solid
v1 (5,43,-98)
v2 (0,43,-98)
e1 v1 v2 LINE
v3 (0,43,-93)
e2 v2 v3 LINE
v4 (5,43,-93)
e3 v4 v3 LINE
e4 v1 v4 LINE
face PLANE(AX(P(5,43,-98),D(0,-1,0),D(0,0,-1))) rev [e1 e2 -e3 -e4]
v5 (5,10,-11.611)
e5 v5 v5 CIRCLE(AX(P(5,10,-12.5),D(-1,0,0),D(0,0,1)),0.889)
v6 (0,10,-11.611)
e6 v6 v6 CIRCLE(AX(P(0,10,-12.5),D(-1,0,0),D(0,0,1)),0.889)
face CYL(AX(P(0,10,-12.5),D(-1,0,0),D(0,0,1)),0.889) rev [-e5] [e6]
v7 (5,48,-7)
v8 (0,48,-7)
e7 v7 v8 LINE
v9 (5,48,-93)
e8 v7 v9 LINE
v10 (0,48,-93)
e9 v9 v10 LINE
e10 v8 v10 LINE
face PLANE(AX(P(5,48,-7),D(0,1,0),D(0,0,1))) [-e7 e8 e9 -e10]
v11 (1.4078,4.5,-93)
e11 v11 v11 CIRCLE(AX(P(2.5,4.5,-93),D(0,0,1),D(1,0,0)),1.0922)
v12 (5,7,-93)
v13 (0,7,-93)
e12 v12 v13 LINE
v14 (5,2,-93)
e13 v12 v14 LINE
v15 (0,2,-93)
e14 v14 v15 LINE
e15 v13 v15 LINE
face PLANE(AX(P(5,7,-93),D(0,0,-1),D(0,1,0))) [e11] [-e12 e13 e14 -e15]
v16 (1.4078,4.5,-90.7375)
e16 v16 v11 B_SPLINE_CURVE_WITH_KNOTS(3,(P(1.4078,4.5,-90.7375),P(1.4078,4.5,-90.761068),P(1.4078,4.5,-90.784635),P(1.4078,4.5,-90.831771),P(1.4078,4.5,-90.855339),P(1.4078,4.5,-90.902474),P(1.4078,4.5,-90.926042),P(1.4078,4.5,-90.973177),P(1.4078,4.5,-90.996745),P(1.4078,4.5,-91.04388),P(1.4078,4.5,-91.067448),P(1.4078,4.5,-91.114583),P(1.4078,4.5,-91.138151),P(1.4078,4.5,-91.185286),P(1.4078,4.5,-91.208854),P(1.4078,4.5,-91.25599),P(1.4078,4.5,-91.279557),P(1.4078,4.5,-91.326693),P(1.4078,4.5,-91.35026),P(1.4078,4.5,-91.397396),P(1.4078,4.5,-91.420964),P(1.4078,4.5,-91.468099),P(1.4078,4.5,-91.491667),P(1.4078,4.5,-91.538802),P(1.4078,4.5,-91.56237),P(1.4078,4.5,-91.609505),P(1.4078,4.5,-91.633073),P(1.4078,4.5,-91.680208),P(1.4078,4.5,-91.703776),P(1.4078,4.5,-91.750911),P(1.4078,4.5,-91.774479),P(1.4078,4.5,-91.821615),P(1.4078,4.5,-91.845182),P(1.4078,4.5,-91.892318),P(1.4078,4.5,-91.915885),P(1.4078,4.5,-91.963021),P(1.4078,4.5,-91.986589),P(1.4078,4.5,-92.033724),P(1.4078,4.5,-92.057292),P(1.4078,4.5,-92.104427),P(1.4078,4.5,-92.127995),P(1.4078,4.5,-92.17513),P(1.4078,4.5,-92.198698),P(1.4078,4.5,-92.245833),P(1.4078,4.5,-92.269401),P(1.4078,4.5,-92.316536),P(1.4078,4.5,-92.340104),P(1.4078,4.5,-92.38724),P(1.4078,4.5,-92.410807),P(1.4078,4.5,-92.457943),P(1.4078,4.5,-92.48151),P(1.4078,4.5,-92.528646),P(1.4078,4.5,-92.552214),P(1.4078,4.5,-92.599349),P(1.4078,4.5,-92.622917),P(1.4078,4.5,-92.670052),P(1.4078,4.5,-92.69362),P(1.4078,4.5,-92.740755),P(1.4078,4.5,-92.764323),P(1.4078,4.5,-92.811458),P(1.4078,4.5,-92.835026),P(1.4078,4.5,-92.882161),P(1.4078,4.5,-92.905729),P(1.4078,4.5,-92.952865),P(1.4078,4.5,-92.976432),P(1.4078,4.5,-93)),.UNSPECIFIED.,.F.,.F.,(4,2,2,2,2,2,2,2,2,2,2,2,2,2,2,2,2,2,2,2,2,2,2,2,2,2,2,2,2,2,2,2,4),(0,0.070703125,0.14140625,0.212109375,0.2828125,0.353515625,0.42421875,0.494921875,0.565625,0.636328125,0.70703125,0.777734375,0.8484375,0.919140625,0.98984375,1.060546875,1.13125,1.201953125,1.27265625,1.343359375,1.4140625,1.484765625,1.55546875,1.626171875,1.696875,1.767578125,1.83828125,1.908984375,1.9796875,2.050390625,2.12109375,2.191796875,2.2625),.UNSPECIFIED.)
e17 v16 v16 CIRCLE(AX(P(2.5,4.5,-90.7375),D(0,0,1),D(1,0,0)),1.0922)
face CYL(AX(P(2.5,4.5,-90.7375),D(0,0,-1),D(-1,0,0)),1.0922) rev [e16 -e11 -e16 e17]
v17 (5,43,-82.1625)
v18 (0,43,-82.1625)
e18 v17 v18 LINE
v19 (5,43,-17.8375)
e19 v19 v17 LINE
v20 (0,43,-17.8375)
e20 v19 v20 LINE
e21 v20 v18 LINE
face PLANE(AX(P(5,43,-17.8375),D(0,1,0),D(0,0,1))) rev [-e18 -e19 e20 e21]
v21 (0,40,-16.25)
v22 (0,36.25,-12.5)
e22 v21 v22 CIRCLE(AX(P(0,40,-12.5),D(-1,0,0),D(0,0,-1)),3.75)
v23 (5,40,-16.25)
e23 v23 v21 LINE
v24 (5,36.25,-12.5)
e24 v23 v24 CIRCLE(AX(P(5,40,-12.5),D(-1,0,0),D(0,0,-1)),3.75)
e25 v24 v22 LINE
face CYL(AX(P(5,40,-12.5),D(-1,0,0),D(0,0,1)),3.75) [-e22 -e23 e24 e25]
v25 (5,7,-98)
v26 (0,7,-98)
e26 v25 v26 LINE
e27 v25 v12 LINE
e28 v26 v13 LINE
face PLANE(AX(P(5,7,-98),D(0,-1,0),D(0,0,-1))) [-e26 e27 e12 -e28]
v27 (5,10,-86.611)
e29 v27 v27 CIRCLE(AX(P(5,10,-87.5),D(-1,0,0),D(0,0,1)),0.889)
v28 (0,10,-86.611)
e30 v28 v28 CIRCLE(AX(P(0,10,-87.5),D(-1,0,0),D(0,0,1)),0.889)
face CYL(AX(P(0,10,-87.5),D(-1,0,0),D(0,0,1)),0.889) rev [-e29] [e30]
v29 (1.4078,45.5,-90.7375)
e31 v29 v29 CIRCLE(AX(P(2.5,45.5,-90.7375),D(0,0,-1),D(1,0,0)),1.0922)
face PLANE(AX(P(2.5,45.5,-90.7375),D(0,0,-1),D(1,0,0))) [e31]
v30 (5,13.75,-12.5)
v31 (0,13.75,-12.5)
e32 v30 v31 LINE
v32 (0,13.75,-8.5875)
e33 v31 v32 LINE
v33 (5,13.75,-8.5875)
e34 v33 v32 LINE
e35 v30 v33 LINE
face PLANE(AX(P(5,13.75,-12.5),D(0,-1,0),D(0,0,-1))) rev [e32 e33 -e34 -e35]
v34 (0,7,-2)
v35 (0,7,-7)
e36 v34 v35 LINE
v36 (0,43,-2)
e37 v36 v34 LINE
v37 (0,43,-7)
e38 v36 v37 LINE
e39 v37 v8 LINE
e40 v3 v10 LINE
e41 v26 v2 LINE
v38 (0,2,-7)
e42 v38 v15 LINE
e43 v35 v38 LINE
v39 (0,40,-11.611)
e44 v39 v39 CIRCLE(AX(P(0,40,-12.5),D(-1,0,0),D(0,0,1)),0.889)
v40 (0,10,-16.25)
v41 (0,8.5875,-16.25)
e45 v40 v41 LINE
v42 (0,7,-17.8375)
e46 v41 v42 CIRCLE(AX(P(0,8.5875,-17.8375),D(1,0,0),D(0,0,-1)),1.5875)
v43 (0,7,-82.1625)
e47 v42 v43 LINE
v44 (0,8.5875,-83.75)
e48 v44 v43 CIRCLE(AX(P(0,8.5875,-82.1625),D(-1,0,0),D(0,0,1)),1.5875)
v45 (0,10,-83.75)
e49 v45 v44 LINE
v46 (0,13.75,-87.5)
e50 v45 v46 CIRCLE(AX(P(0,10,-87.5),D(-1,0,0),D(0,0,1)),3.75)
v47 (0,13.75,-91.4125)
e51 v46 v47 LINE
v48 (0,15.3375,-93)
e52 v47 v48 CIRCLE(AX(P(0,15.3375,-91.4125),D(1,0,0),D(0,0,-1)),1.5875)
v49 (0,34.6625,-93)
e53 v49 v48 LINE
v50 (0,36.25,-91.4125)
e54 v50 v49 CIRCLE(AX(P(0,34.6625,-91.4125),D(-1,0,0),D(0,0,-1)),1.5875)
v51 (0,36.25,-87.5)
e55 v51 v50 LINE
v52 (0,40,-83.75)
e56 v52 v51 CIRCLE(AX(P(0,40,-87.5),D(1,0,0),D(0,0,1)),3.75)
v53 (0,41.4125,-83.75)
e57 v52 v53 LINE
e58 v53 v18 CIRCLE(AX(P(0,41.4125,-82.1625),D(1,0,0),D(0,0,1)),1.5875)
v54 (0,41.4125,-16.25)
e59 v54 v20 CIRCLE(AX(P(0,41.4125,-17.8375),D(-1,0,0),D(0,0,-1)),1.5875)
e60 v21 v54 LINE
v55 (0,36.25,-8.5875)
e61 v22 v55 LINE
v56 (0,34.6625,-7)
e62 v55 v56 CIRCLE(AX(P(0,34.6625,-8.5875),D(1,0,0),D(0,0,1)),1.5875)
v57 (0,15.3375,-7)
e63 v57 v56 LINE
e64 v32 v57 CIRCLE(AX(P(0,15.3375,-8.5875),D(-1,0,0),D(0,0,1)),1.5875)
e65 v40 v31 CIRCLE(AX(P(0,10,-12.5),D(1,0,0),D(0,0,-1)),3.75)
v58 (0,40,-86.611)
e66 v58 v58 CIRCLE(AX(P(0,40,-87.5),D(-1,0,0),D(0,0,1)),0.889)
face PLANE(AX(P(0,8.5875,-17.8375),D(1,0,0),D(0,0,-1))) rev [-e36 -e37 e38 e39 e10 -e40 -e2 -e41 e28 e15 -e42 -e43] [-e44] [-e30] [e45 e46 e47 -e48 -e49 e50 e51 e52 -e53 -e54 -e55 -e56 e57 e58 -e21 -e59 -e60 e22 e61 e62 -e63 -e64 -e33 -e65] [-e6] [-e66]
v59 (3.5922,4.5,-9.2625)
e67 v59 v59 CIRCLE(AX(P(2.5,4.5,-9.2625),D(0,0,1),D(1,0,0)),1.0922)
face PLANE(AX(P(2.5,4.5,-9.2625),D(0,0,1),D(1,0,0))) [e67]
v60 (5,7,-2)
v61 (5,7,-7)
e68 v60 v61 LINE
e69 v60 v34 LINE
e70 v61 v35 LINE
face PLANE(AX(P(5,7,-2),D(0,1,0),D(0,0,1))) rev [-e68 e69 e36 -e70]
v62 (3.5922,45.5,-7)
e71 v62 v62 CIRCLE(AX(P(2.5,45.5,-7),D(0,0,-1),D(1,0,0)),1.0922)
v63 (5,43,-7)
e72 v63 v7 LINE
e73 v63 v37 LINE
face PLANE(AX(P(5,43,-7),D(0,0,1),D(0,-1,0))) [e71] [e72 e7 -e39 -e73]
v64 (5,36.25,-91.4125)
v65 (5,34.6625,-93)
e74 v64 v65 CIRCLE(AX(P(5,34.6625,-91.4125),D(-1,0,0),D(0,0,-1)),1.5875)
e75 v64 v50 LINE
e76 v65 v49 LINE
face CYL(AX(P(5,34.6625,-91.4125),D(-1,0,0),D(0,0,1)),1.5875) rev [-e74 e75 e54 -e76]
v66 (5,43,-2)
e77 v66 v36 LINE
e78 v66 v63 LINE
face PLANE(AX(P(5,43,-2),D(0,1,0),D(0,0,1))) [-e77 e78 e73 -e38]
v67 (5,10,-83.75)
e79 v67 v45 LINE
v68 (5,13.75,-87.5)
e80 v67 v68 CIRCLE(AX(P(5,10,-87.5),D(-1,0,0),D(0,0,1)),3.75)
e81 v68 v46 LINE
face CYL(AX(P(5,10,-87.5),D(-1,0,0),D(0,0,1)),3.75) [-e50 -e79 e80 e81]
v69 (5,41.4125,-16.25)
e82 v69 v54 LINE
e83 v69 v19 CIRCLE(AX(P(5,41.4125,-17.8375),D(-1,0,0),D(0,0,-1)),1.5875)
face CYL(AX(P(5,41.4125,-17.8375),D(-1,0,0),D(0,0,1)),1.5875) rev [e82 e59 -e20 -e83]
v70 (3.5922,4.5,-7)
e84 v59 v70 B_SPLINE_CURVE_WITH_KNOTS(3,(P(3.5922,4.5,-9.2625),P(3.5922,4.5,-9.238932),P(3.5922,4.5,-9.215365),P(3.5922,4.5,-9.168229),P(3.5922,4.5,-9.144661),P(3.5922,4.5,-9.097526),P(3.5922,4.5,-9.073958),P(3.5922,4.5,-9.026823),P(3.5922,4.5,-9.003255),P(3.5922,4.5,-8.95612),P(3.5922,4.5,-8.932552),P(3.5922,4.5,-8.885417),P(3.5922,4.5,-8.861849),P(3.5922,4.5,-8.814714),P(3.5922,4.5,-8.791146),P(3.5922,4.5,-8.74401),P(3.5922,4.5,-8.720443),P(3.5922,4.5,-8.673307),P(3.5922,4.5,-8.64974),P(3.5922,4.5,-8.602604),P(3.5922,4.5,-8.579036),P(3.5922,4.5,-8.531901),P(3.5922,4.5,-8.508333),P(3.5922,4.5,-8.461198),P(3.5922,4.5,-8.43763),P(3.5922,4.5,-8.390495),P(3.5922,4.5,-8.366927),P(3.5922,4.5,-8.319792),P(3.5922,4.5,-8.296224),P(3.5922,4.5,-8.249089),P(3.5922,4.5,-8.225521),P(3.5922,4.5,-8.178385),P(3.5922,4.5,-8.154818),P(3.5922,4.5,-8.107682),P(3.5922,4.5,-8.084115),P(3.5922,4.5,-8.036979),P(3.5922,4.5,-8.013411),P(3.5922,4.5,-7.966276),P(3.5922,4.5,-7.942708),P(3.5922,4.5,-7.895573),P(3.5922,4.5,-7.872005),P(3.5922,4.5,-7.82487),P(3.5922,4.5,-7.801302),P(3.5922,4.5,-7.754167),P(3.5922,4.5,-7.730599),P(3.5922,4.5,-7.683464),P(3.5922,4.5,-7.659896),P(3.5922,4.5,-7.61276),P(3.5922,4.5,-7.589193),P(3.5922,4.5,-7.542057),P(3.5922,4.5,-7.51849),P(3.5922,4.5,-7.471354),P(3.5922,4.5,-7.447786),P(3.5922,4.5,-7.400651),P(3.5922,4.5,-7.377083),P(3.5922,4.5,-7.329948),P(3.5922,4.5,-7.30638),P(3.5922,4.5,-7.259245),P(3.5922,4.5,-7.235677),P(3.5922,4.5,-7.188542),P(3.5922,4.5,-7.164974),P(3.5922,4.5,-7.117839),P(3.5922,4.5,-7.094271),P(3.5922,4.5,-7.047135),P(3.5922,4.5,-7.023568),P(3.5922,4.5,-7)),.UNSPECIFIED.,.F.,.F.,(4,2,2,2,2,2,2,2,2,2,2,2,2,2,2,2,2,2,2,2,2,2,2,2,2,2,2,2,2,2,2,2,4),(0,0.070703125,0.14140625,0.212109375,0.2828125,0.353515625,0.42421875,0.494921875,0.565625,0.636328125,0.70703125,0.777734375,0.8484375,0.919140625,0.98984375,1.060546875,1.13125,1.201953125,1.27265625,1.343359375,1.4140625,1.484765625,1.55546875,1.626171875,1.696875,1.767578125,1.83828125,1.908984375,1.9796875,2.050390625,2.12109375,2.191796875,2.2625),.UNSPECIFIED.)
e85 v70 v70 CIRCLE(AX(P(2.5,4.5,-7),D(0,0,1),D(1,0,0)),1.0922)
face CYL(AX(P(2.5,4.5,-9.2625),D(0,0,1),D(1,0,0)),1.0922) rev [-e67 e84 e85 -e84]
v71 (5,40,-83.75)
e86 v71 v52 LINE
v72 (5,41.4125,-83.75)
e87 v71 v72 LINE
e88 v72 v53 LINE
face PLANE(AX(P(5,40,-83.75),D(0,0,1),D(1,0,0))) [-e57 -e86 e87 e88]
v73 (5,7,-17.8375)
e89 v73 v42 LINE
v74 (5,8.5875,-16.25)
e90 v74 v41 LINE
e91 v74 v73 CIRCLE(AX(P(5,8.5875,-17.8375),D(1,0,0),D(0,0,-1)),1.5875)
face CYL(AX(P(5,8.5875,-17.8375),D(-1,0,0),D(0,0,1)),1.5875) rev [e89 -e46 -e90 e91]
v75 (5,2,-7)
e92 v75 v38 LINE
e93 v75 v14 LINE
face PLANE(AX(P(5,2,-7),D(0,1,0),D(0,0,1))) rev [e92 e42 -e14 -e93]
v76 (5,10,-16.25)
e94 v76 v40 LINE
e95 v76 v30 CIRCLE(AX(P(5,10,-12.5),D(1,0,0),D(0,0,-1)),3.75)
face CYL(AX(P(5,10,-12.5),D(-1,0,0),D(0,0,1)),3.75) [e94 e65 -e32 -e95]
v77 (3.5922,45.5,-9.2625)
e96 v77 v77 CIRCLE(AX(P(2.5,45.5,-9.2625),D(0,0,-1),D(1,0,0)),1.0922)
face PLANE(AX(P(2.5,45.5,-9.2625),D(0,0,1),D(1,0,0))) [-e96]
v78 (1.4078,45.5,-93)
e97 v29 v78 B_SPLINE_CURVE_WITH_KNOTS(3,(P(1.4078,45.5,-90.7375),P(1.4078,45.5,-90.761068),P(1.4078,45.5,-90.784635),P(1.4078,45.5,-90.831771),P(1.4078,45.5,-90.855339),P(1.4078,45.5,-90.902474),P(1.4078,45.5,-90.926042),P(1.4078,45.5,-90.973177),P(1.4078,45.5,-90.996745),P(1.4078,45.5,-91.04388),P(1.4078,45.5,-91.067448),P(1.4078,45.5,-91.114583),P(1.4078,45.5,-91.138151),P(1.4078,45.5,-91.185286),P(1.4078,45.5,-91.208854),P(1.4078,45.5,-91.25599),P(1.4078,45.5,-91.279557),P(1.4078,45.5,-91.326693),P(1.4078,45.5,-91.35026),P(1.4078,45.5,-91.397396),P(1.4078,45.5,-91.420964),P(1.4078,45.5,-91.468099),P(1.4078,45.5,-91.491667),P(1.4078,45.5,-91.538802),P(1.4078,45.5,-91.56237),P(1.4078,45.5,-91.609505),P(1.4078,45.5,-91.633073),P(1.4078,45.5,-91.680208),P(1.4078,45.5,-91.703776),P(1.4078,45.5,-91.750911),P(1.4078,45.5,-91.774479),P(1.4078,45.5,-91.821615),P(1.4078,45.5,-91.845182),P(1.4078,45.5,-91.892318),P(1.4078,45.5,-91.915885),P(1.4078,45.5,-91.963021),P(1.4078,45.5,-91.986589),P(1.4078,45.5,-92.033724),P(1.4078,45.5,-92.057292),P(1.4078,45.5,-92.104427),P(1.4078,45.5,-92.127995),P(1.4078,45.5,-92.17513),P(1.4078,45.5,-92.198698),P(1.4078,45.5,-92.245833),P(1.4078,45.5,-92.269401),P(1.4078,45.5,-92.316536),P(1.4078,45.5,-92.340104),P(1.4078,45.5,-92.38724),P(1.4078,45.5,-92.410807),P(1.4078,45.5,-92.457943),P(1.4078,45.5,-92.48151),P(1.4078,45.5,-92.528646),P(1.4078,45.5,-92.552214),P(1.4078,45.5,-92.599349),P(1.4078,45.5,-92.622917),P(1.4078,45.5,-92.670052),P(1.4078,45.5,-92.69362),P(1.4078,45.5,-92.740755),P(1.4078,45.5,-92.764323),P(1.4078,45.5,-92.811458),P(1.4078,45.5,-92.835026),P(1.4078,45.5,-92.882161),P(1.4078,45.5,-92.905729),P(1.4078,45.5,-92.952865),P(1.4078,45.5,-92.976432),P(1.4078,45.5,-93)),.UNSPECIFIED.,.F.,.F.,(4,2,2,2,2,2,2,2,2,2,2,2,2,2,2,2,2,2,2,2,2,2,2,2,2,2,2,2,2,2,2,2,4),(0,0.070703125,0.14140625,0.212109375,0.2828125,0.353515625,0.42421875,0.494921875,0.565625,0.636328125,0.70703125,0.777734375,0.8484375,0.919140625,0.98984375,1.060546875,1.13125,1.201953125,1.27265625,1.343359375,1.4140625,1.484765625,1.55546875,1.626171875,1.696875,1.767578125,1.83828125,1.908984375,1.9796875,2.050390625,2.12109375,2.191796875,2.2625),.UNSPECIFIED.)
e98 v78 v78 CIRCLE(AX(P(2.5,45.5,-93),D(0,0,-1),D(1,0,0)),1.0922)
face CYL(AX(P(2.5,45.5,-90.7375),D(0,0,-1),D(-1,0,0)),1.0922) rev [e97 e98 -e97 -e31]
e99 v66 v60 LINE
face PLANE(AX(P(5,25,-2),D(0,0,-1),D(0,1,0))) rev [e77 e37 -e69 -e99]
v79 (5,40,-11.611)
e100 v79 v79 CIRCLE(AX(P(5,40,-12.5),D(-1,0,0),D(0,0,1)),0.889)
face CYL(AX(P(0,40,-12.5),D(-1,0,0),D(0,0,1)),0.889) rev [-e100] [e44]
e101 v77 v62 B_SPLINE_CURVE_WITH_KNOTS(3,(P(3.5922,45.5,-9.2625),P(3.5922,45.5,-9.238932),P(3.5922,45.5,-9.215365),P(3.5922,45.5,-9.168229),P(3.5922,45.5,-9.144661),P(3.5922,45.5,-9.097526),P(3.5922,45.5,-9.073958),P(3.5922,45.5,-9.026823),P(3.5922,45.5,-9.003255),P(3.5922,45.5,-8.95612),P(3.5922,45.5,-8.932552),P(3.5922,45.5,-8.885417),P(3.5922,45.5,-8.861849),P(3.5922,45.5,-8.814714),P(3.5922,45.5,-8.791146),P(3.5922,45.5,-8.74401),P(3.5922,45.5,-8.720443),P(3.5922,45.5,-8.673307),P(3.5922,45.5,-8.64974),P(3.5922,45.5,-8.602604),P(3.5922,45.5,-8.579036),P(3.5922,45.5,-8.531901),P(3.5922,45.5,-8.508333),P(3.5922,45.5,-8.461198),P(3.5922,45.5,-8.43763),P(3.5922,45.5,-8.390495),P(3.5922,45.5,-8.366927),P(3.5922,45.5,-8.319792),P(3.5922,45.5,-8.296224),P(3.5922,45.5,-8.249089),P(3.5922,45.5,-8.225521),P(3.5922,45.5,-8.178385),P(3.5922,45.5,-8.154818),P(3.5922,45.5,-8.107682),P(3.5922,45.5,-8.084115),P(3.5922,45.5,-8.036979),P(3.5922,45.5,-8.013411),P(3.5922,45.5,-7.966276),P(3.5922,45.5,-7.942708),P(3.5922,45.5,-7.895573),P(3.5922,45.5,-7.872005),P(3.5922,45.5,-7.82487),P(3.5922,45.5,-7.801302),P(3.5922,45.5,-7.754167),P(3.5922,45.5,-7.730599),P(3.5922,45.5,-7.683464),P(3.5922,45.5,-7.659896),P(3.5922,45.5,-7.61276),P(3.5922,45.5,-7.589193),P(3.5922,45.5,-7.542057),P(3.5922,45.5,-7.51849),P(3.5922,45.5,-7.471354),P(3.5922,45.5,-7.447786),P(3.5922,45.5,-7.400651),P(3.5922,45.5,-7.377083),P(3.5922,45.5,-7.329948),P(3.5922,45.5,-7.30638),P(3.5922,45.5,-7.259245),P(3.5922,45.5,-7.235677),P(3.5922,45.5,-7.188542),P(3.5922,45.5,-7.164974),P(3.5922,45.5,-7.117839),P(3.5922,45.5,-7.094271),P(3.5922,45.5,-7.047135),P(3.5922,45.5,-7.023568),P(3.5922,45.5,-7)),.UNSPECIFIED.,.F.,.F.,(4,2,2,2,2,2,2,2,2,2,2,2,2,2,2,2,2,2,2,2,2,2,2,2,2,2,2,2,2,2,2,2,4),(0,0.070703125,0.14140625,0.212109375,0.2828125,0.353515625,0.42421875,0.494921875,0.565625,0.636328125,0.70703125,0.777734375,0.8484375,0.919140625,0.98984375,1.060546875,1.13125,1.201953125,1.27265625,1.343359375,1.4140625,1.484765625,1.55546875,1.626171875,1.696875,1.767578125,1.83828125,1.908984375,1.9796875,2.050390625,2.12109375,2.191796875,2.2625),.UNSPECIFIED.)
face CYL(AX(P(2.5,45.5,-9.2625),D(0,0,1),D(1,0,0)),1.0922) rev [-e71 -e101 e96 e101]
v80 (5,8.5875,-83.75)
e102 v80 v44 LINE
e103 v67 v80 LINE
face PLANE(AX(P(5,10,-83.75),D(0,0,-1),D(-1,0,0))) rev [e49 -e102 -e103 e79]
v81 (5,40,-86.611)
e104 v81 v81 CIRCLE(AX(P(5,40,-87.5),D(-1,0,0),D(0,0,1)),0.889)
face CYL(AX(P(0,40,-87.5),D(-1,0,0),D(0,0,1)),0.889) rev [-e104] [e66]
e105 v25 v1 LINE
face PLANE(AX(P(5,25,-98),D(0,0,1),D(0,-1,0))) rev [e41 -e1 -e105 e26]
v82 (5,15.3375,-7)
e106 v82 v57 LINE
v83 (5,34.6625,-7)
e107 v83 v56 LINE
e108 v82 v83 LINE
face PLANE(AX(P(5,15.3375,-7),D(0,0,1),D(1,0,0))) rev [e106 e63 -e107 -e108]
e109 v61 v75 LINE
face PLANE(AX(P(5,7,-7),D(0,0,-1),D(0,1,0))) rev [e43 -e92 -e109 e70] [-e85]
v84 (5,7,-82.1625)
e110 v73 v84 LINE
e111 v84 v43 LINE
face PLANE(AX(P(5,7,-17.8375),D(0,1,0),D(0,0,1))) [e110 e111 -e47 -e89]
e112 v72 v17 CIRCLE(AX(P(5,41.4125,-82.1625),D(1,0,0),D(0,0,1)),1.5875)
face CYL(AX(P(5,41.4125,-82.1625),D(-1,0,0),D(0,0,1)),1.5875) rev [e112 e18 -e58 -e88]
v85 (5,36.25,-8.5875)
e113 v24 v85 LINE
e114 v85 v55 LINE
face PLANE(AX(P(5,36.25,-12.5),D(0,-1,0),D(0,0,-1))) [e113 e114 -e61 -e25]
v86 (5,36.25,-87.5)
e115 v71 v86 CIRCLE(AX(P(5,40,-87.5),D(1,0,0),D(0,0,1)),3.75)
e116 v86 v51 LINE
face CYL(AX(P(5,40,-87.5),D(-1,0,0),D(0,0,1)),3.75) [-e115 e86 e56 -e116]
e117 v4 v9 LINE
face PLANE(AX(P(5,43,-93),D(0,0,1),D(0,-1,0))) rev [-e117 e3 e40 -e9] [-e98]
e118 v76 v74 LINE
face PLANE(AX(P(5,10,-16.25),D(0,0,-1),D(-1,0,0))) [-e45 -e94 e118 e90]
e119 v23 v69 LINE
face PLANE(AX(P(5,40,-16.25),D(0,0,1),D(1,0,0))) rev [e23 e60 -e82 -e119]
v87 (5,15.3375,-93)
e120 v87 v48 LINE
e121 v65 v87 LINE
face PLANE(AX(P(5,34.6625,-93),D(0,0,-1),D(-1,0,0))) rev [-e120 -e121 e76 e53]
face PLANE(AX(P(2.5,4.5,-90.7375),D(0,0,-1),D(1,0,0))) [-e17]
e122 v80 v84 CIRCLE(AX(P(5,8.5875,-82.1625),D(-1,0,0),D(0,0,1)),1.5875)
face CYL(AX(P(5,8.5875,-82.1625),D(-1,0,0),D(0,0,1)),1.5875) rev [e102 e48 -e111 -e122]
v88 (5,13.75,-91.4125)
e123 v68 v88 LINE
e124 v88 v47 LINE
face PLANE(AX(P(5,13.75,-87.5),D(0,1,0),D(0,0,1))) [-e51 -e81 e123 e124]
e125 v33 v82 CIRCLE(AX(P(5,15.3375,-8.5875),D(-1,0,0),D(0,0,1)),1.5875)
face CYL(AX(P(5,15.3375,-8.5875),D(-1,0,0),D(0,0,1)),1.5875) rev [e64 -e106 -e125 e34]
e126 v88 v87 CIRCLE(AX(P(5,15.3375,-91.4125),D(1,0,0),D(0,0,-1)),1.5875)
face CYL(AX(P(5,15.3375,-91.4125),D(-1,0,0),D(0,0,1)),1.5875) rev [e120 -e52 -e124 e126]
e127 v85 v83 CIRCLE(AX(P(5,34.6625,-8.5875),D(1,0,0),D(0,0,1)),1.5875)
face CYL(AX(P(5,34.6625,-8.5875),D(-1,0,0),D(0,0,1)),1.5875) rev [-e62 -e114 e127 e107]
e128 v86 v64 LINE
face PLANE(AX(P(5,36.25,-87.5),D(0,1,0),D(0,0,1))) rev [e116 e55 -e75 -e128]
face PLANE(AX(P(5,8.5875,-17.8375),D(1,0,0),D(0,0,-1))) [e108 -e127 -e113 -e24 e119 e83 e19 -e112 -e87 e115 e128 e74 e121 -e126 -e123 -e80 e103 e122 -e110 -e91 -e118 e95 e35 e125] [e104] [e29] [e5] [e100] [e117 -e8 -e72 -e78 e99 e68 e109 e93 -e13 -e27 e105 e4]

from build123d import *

# Parameters (mm, degrees)
BOSS_EXTRUDE2_DEPTH       = 5
SKETCH3_R                 = 1.0922
CUT_EXTRUDE2_DEPTH        = 2.2625
MIRROR27_START            = 3.5922
MIRROR27_DEPTH            = 1.4078
MIRROR27_2_DEPTH          = 1.4077999
MIRROR27_START_2          = 1.4077999
MIRROR27_3_DEPTH          = 2.1844001
MIRROR27_START_3          = -93
MIRROR27_4_OUTLINE_R      = 1.0922
MIRROR27_4_DEPTH          = 2.2625
TAP_DRILL_FOR_2_56_TAP1_D = 1.778


with BuildPart() as part:
    # Sketch1 → Boss-Extrude2 (new body)
    with BuildSketch(Plane(origin=(0, 0, 0), x_dir=(0, 0, -1), z_dir=(1, 0, 0))):
        with BuildLine():
            Line((2, 25), (7, 25))
            Line((7, 25), (7, 15.3375))
            ThreePointArc((7, 15.3375), (7.464967985, 14.214967985), (8.5875, 13.75))
            Line((8.5875, 13.75), (12.5, 13.75))
            ThreePointArc((12.5, 13.75), (15.151650429, 12.651650429), (16.25, 10))
            Line((16.25, 10), (16.25, 8.5875))
            ThreePointArc((16.25, 8.5875), (16.714967985, 7.464967985), (17.8375, 7))
            Line((17.8375, 7), (50, 7))
            Line((50, 7), (50, 2))
            Line((50, 2), (7, 2))
            Line((7, 2), (7, 7))
            Line((7, 7), (2, 7))
            Line((2, 7), (2, 25))
        make_face()
    boss_extrude2 = extrude(amount=BOSS_EXTRUDE2_DEPTH)

    # Sketch3 → Cut-Extrude2 (cut)
    with BuildSketch(Plane.XY.offset(-7)):
        with Locations((2.5, 4.5)):
            Circle(SKETCH3_R)
    cut_extrude2 = extrude(amount=-CUT_EXTRUDE2_DEPTH, mode=Mode.SUBTRACT)

    # Mirror26: Boss-Extrude2, Cut-Extrude2 across plane
    add(boss_extrude2.mirror(Plane.ZX.offset(25)))
    add(cut_extrude2.mirror(Plane.ZX.offset(25)), mode=Mode.SUBTRACT)

    # Mirror27: read off the stored shape, not the designer's step
    # Mirror27 outline → Mirror27 (add)
    with BuildSketch(Plane.YZ.offset(MIRROR27_START)):
        with BuildLine():
            ThreePointArc((15.3375, -93), (14.214967985, -92.535032015), (13.75, -91.4125))
            Line((13.75, -91.4125), (13.75, -87.5))
            ThreePointArc((13.75, -87.5), (12.651650429, -84.848349571), (10, -83.75))
            Line((10, -83.75), (8.5875, -83.75))
            ThreePointArc((8.5875, -83.75), (7.464967985, -83.285032015), (7, -82.1625))
            Line((7, -82.1625), (7, -50))
            Line((7, -50), (2, -50))
            Line((2, -50), (2, -93))
            Line((2, -93), (7, -93))
            Line((7, -93), (7, -98))
            Line((7, -98), (43, -98))
            Line((43, -98), (43, -93))
            Line((43, -93), (48, -93))
            Line((48, -93), (48, -50))
            Line((48, -50), (43, -50))
            Line((43, -50), (43, -82.1625))
            ThreePointArc((43, -82.1625), (42.535032015, -83.285032015), (41.4125, -83.75))
            Line((41.4125, -83.75), (40, -83.75))
            ThreePointArc((40, -83.75), (37.348349571, -84.848349571), (36.25, -87.5))
            Line((36.25, -87.5), (36.25, -91.4125))
            ThreePointArc((36.25, -91.4125), (35.785032015, -92.535032015), (34.6625, -93))
            Line((34.6625, -93), (15.3375, -93))
        make_face()
    extrude(amount=MIRROR27_DEPTH)

    # Mirror27 2 outline → Mirror27 2 (add)
    with BuildSketch(Plane.YZ):
        with BuildLine():
            ThreePointArc((15.3375, -93), (14.214967985, -92.535032015), (13.75, -91.4125))
            Line((13.75, -91.4125), (13.75, -87.5))
            ThreePointArc((13.75, -87.5), (12.651650429, -84.848349571), (10, -83.75))
            Line((10, -83.75), (8.5875, -83.75))
            ThreePointArc((8.5875, -83.75), (7.464967985, -83.285032015), (7, -82.1625))
            Line((7, -82.1625), (7, -50))
            Line((7, -50), (2, -50))
            Line((2, -50), (2, -93))
            Line((2, -93), (7, -93))
            Line((7, -93), (7, -98))
            Line((7, -98), (43, -98))
            Line((43, -98), (43, -93))
            Line((43, -93), (48, -93))
            Line((48, -93), (48, -50))
            Line((48, -50), (43, -50))
            Line((43, -50), (43, -82.1625))
            ThreePointArc((43, -82.1625), (42.535032015, -83.285032015), (41.4125, -83.75))
            Line((41.4125, -83.75), (40, -83.75))
            ThreePointArc((40, -83.75), (37.348349571, -84.848349571), (36.25, -87.5))
            Line((36.25, -87.5), (36.25, -91.4125))
            ThreePointArc((36.25, -91.4125), (35.785032015, -92.535032015), (34.6625, -93))
            Line((34.6625, -93), (15.3375, -93))
        make_face()
    extrude(amount=MIRROR27_2_DEPTH)

    # Mirror27 3 outline → Mirror27 3 (add)
    with BuildSketch(Plane.YZ.offset(MIRROR27_START_2)):
        with BuildLine():
            ThreePointArc((15.3375, -93), (14.214967985, -92.535032015), (13.75, -91.4125))
            Line((13.75, -91.4125), (13.75, -87.5))
            ThreePointArc((13.75, -87.5), (12.651650429, -84.848349571), (10, -83.75))
            Line((10, -83.75), (8.5875, -83.75))
            ThreePointArc((8.5875, -83.75), (7.464967985, -83.285032015), (7, -82.1625))
            Line((7, -82.1625), (7, -50))
            Line((7, -50), (2, -50))
            Line((2, -50), (2, -93))
            Line((2, -93), (7, -93))
            Line((7, -93), (7, -98))
            Line((7, -98), (43, -98))
            Line((43, -98), (43, -93))
            Line((43, -93), (48, -93))
            Line((48, -93), (48, -50))
            Line((48, -50), (43, -50))
            Line((43, -50), (43, -82.1625))
            ThreePointArc((43, -82.1625), (42.535032015, -83.285032015), (41.4125, -83.75))
            Line((41.4125, -83.75), (40, -83.75))
            ThreePointArc((40, -83.75), (37.348349571, -84.848349571), (36.25, -87.5))
            Line((36.25, -87.5), (36.25, -91.4125))
            ThreePointArc((36.25, -91.4125), (35.785032015, -92.535032015), (34.6625, -93))
            Line((34.6625, -93), (15.3375, -93))
        make_face()
    extrude(amount=MIRROR27_3_DEPTH)

    # Mirror27 4 outline → Mirror27 4 (cut)
    with BuildSketch(Plane.XY.offset(MIRROR27_START_3)):
        with Locations((2.5, 4.5)):
            Circle(MIRROR27_4_OUTLINE_R)
        with Locations((2.5, 45.5)):
            Circle(MIRROR27_4_OUTLINE_R)
    extrude(amount=MIRROR27_4_DEPTH, mode=Mode.SUBTRACT)

    # Tap Drill for #2-56 Tap1 (through all)
    with Locations(Plane.ZY):
        with Locations((-87.5, 10), (-87.5, 40), (-12.5, 40), (-12.5, 10)):
            Hole(TAP_DRILL_FOR_2_56_TAP1_D / 2)


solid = part.part
